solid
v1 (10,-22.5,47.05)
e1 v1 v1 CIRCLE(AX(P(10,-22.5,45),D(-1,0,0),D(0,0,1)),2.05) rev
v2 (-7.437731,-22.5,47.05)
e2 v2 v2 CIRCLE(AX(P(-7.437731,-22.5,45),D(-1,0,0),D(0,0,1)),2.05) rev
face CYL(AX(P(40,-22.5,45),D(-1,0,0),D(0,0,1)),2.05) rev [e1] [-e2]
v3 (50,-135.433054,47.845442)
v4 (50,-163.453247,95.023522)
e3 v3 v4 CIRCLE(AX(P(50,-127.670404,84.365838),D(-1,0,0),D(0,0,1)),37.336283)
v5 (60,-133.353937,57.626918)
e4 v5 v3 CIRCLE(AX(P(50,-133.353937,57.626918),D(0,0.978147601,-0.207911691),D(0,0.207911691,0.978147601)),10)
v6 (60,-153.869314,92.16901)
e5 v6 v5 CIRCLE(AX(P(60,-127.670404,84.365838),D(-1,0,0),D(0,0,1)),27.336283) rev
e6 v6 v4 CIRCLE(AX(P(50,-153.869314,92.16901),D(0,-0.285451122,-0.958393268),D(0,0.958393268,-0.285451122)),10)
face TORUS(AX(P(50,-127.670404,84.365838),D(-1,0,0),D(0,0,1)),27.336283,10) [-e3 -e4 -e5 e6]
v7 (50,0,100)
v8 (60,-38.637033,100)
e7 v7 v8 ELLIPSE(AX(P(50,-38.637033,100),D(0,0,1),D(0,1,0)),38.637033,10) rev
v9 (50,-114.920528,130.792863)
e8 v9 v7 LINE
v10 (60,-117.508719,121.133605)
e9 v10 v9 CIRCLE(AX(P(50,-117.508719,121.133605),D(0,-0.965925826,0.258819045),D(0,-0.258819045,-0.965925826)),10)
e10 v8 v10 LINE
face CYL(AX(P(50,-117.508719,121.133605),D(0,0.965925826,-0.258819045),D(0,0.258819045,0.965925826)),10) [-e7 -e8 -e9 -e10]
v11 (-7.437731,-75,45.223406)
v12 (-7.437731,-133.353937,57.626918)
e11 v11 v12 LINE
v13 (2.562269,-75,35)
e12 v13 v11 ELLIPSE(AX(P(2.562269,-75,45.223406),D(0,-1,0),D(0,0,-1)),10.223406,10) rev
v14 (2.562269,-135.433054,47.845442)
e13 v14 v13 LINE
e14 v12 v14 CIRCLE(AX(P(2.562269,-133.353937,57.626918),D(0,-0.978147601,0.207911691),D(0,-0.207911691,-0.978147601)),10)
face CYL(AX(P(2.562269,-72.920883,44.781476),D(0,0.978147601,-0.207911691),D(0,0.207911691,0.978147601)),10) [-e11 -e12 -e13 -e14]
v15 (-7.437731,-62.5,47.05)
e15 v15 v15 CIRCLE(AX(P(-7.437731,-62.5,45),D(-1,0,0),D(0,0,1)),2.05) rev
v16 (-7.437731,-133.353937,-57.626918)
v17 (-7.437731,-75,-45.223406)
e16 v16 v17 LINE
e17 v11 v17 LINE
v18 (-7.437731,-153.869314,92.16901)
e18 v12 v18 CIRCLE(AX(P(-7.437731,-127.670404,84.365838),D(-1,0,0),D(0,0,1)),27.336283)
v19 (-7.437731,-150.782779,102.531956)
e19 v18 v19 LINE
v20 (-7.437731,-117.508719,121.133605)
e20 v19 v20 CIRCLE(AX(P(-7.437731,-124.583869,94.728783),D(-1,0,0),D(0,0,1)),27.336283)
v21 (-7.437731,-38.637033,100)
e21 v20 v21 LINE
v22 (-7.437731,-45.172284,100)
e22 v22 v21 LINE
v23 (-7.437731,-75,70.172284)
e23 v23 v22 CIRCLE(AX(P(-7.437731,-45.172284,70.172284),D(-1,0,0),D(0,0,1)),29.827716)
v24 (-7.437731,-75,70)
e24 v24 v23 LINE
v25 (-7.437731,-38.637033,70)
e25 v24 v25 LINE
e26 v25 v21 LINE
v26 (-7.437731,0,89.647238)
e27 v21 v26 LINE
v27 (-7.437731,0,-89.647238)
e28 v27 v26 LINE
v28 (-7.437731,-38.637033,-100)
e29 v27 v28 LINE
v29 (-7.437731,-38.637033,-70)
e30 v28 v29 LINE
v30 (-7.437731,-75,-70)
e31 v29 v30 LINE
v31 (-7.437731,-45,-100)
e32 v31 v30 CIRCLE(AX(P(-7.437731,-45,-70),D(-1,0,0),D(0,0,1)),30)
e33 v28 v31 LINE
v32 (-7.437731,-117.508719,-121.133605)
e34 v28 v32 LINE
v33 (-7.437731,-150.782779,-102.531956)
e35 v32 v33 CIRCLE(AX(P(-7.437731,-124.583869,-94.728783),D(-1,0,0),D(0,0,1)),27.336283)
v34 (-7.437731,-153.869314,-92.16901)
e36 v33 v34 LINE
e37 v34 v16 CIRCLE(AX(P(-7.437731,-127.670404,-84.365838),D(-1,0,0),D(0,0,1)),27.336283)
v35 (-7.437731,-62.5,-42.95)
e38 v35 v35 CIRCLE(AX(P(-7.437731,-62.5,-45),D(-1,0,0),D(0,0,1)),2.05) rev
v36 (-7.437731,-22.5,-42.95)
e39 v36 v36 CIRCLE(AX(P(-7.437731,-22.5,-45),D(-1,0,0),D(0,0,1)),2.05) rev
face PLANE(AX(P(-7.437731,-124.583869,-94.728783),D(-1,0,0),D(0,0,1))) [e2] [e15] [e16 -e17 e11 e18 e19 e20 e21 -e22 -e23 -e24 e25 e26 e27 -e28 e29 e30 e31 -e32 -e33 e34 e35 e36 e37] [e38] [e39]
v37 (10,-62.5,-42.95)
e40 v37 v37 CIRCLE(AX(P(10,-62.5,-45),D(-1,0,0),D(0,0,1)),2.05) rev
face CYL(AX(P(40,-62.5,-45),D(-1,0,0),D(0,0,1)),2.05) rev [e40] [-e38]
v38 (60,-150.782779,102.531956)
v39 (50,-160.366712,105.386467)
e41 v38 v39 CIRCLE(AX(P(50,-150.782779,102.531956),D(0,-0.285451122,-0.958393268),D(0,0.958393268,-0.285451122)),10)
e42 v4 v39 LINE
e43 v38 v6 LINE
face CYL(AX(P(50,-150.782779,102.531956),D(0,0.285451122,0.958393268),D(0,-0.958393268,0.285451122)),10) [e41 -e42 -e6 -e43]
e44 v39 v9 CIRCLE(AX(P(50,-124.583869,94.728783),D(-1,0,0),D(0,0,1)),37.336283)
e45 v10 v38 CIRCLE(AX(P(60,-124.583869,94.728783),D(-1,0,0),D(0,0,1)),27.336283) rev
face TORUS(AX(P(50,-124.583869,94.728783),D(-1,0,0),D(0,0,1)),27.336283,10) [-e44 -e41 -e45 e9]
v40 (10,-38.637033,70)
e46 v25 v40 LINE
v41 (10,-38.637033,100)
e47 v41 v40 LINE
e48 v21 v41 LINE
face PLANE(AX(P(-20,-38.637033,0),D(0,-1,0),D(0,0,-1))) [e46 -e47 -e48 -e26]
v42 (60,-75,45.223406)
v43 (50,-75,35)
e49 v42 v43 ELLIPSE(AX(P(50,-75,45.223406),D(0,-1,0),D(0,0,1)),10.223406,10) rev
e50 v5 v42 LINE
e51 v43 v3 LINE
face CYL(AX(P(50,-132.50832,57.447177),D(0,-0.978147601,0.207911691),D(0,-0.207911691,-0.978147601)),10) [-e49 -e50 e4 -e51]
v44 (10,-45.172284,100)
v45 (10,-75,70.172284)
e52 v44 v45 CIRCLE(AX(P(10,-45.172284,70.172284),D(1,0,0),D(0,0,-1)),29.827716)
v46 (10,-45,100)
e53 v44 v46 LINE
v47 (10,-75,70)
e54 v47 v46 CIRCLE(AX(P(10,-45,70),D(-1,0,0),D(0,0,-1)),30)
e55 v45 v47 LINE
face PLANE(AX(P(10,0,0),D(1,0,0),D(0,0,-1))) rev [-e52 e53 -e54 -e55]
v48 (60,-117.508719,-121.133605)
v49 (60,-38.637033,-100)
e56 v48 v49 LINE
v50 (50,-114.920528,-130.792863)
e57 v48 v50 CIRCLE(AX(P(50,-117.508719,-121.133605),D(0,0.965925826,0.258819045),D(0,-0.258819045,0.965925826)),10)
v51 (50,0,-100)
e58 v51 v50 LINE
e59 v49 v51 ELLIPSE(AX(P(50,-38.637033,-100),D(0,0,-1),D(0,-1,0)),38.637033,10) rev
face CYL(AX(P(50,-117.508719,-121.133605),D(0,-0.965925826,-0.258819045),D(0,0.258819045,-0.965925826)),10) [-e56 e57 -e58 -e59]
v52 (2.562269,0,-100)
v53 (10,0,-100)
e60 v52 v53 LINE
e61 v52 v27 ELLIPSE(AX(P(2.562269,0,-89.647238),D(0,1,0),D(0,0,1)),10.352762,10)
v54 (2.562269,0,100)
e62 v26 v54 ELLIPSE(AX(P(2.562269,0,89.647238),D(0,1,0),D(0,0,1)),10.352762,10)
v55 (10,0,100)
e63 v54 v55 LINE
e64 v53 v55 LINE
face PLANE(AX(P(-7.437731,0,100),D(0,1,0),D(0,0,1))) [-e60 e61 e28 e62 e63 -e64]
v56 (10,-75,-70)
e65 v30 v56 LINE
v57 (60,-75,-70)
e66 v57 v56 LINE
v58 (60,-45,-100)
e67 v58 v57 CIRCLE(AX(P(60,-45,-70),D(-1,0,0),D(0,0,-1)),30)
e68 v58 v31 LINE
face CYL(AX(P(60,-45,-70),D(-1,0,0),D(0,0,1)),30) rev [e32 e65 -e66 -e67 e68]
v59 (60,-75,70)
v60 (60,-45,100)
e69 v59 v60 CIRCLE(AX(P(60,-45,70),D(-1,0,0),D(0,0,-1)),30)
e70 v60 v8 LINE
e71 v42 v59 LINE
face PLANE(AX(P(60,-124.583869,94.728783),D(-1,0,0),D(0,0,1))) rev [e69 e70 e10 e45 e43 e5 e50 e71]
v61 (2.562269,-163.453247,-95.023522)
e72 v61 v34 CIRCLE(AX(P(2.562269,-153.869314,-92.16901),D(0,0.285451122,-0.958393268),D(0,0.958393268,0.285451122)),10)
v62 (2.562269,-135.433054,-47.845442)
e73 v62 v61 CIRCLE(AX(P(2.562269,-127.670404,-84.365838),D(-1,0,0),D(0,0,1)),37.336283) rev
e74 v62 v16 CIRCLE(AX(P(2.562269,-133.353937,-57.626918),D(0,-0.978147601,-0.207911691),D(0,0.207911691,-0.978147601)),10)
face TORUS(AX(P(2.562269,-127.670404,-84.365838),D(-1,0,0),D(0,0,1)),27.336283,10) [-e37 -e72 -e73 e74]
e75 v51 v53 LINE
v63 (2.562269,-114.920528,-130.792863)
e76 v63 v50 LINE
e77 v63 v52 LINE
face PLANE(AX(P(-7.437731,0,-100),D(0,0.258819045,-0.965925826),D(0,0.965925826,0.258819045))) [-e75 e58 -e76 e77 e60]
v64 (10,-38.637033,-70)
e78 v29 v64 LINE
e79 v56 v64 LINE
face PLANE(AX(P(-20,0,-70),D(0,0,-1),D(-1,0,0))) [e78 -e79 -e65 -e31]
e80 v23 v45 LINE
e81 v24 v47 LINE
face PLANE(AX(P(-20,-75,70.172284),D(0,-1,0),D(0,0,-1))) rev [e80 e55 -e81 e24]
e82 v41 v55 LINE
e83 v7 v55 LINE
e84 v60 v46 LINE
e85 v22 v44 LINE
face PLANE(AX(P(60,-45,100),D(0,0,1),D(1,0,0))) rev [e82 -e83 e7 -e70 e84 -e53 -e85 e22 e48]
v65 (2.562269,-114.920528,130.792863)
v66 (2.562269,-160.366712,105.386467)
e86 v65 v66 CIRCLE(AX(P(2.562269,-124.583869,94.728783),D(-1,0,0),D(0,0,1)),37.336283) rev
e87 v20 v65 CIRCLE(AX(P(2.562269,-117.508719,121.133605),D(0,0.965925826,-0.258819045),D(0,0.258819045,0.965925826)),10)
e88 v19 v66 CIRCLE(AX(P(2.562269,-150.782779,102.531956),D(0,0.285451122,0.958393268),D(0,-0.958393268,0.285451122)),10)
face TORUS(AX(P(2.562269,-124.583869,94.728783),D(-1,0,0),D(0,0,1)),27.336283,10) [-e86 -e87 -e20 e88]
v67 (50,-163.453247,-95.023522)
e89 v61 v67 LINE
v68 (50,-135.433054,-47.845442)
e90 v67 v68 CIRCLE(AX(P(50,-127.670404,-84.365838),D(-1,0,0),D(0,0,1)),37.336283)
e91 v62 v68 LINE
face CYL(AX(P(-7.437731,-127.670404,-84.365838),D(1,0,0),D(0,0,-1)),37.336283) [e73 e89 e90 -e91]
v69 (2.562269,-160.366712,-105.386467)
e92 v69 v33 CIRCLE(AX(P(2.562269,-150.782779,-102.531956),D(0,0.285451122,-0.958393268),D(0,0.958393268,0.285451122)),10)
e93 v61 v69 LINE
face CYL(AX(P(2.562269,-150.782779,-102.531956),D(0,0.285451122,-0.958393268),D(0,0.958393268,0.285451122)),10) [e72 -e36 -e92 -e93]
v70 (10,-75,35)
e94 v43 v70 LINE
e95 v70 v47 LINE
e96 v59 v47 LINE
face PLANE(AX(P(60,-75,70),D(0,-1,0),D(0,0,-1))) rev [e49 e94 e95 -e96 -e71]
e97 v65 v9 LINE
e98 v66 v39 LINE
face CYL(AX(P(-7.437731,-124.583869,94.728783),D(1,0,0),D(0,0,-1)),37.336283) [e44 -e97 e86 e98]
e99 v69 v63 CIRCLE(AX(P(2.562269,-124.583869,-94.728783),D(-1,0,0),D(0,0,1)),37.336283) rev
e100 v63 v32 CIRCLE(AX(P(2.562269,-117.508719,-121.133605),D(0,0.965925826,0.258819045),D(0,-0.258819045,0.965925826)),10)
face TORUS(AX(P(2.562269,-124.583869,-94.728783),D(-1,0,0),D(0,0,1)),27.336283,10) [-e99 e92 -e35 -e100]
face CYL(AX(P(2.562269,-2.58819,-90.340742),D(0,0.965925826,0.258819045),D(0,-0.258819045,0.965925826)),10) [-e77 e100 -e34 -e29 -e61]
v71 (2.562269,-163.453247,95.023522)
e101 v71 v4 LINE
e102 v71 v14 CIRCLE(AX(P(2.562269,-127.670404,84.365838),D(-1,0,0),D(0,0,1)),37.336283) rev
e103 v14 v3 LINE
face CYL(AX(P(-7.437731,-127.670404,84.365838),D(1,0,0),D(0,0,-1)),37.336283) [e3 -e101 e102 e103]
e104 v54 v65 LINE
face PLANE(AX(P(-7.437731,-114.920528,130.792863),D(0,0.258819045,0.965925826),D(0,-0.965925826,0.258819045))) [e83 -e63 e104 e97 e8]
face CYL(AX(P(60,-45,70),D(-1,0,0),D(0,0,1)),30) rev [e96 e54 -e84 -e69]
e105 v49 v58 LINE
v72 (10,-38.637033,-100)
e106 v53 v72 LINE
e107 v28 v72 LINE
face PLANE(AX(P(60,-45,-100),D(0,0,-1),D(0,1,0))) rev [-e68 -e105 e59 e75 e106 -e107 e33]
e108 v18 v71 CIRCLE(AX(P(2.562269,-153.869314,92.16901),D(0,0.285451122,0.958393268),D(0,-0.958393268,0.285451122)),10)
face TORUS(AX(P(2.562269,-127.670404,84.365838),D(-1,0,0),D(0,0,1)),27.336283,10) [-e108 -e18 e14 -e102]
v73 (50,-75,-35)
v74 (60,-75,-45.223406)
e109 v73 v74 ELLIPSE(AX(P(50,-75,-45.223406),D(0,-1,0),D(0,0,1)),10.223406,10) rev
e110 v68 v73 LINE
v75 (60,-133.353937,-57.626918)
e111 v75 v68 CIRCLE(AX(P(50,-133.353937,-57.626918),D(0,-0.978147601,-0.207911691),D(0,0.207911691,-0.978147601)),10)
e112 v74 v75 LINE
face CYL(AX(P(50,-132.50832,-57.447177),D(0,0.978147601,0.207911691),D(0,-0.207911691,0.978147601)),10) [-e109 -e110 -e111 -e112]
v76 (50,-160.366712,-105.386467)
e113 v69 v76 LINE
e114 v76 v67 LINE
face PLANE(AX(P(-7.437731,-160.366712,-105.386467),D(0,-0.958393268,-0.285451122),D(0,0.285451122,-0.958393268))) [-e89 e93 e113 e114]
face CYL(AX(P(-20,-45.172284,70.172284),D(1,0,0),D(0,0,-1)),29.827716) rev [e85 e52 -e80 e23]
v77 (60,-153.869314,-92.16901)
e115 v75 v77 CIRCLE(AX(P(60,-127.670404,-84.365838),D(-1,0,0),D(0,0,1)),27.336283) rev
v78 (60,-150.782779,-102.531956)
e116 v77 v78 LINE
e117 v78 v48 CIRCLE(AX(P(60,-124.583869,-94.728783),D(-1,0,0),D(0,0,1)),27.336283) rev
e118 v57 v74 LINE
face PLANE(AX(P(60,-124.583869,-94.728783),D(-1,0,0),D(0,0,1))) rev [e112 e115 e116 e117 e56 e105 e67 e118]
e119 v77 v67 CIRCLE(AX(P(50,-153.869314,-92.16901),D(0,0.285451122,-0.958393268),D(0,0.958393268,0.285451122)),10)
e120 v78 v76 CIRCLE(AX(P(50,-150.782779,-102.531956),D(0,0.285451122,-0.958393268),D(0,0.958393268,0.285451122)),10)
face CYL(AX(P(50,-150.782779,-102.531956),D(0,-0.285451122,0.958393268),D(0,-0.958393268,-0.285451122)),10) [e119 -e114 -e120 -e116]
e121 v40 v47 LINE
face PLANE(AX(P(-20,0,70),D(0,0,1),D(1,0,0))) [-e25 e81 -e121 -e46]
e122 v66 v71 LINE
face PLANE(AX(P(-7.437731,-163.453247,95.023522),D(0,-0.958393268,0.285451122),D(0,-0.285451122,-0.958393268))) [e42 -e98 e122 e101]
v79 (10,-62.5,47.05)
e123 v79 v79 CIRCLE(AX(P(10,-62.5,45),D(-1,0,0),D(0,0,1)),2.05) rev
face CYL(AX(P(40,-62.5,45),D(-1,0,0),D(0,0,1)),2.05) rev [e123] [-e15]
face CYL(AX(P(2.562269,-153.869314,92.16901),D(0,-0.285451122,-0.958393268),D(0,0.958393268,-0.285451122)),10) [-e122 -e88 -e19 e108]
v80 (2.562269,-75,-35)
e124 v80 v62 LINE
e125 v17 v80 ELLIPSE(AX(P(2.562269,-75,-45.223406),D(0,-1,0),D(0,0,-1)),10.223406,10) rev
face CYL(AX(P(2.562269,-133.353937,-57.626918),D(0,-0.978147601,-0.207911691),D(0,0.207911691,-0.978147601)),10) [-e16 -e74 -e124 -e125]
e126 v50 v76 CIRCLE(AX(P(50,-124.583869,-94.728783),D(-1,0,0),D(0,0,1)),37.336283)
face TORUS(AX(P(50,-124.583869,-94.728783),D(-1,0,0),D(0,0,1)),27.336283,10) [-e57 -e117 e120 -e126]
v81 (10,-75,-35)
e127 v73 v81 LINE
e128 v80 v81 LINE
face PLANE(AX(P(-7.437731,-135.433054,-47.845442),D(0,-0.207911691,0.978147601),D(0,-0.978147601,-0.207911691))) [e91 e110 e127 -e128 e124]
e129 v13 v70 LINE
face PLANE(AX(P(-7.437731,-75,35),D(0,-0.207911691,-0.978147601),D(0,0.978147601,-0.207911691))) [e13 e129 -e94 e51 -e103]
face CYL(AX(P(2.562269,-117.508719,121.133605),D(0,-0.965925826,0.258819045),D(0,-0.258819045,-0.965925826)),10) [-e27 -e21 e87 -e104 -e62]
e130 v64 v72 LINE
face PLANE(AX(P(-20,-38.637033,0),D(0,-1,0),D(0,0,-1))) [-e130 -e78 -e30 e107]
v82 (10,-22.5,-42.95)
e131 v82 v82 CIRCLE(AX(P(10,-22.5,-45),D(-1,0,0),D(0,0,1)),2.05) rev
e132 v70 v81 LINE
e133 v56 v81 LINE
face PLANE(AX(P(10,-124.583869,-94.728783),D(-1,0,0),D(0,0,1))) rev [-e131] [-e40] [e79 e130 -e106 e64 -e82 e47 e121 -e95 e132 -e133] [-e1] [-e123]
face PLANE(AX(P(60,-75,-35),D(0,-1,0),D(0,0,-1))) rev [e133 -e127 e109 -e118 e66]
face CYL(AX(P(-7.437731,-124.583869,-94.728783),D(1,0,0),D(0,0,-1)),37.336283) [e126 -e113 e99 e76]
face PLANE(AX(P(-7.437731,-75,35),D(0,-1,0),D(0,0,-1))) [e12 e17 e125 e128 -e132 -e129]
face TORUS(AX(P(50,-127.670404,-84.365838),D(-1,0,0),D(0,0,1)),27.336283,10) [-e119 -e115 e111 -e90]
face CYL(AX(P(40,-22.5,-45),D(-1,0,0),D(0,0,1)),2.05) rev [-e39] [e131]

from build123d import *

# Parameters (mm, degrees)
BOSS_EXTRUDE1_DEPTH      = 10
BOSS_EXTRUDE1_DEPTH_BACK = 7.437731252
BOSS_EXTRUDE2_DEPTH      = 50
FILLET7_R                = 10
FILLET9_R                = 10
FILLET10_R               = 10
CUT_EXTRUDE1_DEPTH       = 30
CUT_EXTRUDE1_DEPTH_BACK  = 30
SKETCH5_R                = 2.05
CUT_EXTRUDE2_START       = -30
CUT_EXTRUDE2_DEPTH       = 30


with BuildPart() as part:
    # Sketch2 → Boss-Extrude1 (new, two sides: drawn at the far end of the back side and taken through both)
    with BuildSketch(Plane(origin=(0, 0, 0), x_dir=(0, 0, -1), z_dir=(1, 0, 0)).offset(-BOSS_EXTRUDE1_DEPTH_BACK)):
        with BuildLine():
            Line((100, 0), (130.792862778, -114.920528399))
            ThreePointArc((130.792862778, -114.920528399), (127.318193667, -142.802769687), (105.386466731, -160.366711677))
            Line((105.386466731, -160.366711677), (95.023521596, -163.453246629))
            ThreePointArc((95.023521596, -163.453246629), (65.300089376, -159.771732448), (47.8454422, -135.433054144))
            Line((47.8454422, -135.433054144), (35, -75))
            Line((35, -75), (-35, -75))
            Line((-35, -75), (-47.8454422, -135.433054144))
            ThreePointArc((-47.8454422, -135.433054144), (-65.300089376, -159.771732448), (-95.023521596, -163.453246629))
            Line((-95.023521596, -163.453246629), (-105.386466731, -160.366711677))
            ThreePointArc((-105.386466731, -160.366711677), (-127.318193667, -142.802769687), (-130.792862778, -114.920528399))
            Line((-130.792862778, -114.920528399), (-100, 0))
            Line((-100, 0), (-35, 0))
            Line((-35, 0), (35, 0))
            Line((35, 0), (100, 0))
        make_face()
    extrude(amount=BOSS_EXTRUDE1_DEPTH + BOSS_EXTRUDE1_DEPTH_BACK)

    # Sketch3 → Boss-Extrude2 (add)
    with BuildSketch(Plane(origin=(10, 0, 0), x_dir=(0, 0, -1), z_dir=(1, 0, 0))):
        with BuildLine():
            Line((100, 0), (130.792862778, -114.920528399))
            ThreePointArc((130.792862778, -114.920528399), (127.318193667, -142.802769687), (105.386466731, -160.366711677))
            Line((105.386466731, -160.366711677), (95.023521596, -163.453246629))
            ThreePointArc((95.023521596, -163.453246629), (65.300089376, -159.771732448), (47.8454422, -135.433054144))
            Line((47.8454422, -135.433054144), (35, -75))
            Line((35, -75), (70, -75))
            ThreePointArc((70, -75), (91.213203436, -66.213203436), (100, -45))
            Line((100, -45), (100, 0))
        make_face()
        with BuildLine():
            Line((-35, -75), (-47.8454422, -135.433054144))
            ThreePointArc((-47.8454422, -135.433054144), (-65.300089376, -159.771732448), (-95.023521596, -163.453246629))
            Line((-95.023521596, -163.453246629), (-105.386466731, -160.366711677))
            ThreePointArc((-105.386466731, -160.366711677), (-127.318193667, -142.802769687), (-130.792862778, -114.920528399))
            Line((-130.792862778, -114.920528399), (-100, 0))
            Line((-100, 0), (-100, -45))
            ThreePointArc((-100, -45), (-91.213203436, -66.213203436), (-70, -75))
            Line((-70, -75), (-35, -75))
        make_face()
    extrude(amount=BOSS_EXTRUDE2_DEPTH)

    # Fillet7
    fillet7_edges = [part.edges().sort_by_distance(p)[0] for p in [
        (60, -105.216527072, 41.4227211),
        (60, -159.771732448, 65.300089376),
        (60, -161.909979153, 100.204994164),
        (60, -142.802769687, 127.318193667),
        (60, -57.4602642, 115.396431389),
    ]]
    fillet(fillet7_edges, radius=FILLET7_R)

    # Fillet9
    fillet9_edges = [part.edges().sort_by_distance(p)[0] for p in [
        (60, -57.4602642, -115.396431389),
        (60, -159.771732448, -65.300089376),
        (60, -142.802769687, -127.318193667),
        (60, -161.909979153, -100.204994164),
        (60, -105.216527072, -41.4227211),
    ]]
    fillet(fillet9_edges, radius=FILLET9_R)

    # Fillet10
    fillet10_edges = [part.edges().sort_by_distance(p)[0] for p in [
        (-7.437731252, -57.4602642, -115.396431389),
        (-7.437731252, -142.802769687, -127.318193667),
        (-7.437731252, -161.909979153, -100.204994164),
        (-7.437731252, -159.771732448, -65.300089376),
        (-7.437731252, -105.216527072, -41.4227211),
        (-7.437731252, -57.4602642, 115.396431389),
        (-7.437731252, -142.802769687, 127.318193667),
        (-7.437731252, -161.909979153, 100.204994164),
        (-7.437731252, -159.771732448, 65.300089376),
        (-7.437731252, -105.216527072, 41.4227211),
    ]]
    fillet(fillet10_edges, radius=FILLET10_R)

    # Sketch5 → Cut-Extrude1 (cut, two sides: drawn at the far end of the back side and taken through both)
    with BuildSketch(Plane(origin=(10, 0, 0), x_dir=(0, 0, -1), z_dir=(1, 0, 0)).offset(-CUT_EXTRUDE1_DEPTH_BACK)):
        with Locations((45, -62.5)):
            Circle(SKETCH5_R)
        with Locations((-45, -62.5)):
            Circle(SKETCH5_R)
        with Locations((-45, -22.5)):
            Circle(SKETCH5_R)
        with Locations((45, -22.5)):
            Circle(SKETCH5_R)
    extrude(amount=CUT_EXTRUDE1_DEPTH + CUT_EXTRUDE1_DEPTH_BACK, mode=Mode.SUBTRACT)

    # Sketch7 → Cut-Extrude2 (cut)
    with BuildSketch(Plane(origin=(10, 0, 0), x_dir=(0, 0, -1), z_dir=(1, 0, 0)).offset(CUT_EXTRUDE2_START)):
        with BuildLine():
            Line((-70, -38.637033052), (-100, -38.637033052))
            Line((-100, -38.637033052), (-100, -45.17228394))
            ThreePointArc((-100, -45.17228394), (-91.263664233, -66.263664233), (-70.17228394, -75))
            Line((-70.17228394, -75), (-70, -75))
            Line((-70, -75), (-70, -38.637033052))
        make_face()
        with BuildLine():
            ThreePointArc((70, -75), (91.213203436, -66.213203436), (100, -45))
            Line((100, -45), (100, -38.637033052))
            Line((100, -38.637033052), (70, -38.637033052))
            Line((70, -38.637033052), (70, -75))
        make_face()
    extrude(amount=CUT_EXTRUDE2_DEPTH, mode=Mode.SUBTRACT)


solid = part.part
